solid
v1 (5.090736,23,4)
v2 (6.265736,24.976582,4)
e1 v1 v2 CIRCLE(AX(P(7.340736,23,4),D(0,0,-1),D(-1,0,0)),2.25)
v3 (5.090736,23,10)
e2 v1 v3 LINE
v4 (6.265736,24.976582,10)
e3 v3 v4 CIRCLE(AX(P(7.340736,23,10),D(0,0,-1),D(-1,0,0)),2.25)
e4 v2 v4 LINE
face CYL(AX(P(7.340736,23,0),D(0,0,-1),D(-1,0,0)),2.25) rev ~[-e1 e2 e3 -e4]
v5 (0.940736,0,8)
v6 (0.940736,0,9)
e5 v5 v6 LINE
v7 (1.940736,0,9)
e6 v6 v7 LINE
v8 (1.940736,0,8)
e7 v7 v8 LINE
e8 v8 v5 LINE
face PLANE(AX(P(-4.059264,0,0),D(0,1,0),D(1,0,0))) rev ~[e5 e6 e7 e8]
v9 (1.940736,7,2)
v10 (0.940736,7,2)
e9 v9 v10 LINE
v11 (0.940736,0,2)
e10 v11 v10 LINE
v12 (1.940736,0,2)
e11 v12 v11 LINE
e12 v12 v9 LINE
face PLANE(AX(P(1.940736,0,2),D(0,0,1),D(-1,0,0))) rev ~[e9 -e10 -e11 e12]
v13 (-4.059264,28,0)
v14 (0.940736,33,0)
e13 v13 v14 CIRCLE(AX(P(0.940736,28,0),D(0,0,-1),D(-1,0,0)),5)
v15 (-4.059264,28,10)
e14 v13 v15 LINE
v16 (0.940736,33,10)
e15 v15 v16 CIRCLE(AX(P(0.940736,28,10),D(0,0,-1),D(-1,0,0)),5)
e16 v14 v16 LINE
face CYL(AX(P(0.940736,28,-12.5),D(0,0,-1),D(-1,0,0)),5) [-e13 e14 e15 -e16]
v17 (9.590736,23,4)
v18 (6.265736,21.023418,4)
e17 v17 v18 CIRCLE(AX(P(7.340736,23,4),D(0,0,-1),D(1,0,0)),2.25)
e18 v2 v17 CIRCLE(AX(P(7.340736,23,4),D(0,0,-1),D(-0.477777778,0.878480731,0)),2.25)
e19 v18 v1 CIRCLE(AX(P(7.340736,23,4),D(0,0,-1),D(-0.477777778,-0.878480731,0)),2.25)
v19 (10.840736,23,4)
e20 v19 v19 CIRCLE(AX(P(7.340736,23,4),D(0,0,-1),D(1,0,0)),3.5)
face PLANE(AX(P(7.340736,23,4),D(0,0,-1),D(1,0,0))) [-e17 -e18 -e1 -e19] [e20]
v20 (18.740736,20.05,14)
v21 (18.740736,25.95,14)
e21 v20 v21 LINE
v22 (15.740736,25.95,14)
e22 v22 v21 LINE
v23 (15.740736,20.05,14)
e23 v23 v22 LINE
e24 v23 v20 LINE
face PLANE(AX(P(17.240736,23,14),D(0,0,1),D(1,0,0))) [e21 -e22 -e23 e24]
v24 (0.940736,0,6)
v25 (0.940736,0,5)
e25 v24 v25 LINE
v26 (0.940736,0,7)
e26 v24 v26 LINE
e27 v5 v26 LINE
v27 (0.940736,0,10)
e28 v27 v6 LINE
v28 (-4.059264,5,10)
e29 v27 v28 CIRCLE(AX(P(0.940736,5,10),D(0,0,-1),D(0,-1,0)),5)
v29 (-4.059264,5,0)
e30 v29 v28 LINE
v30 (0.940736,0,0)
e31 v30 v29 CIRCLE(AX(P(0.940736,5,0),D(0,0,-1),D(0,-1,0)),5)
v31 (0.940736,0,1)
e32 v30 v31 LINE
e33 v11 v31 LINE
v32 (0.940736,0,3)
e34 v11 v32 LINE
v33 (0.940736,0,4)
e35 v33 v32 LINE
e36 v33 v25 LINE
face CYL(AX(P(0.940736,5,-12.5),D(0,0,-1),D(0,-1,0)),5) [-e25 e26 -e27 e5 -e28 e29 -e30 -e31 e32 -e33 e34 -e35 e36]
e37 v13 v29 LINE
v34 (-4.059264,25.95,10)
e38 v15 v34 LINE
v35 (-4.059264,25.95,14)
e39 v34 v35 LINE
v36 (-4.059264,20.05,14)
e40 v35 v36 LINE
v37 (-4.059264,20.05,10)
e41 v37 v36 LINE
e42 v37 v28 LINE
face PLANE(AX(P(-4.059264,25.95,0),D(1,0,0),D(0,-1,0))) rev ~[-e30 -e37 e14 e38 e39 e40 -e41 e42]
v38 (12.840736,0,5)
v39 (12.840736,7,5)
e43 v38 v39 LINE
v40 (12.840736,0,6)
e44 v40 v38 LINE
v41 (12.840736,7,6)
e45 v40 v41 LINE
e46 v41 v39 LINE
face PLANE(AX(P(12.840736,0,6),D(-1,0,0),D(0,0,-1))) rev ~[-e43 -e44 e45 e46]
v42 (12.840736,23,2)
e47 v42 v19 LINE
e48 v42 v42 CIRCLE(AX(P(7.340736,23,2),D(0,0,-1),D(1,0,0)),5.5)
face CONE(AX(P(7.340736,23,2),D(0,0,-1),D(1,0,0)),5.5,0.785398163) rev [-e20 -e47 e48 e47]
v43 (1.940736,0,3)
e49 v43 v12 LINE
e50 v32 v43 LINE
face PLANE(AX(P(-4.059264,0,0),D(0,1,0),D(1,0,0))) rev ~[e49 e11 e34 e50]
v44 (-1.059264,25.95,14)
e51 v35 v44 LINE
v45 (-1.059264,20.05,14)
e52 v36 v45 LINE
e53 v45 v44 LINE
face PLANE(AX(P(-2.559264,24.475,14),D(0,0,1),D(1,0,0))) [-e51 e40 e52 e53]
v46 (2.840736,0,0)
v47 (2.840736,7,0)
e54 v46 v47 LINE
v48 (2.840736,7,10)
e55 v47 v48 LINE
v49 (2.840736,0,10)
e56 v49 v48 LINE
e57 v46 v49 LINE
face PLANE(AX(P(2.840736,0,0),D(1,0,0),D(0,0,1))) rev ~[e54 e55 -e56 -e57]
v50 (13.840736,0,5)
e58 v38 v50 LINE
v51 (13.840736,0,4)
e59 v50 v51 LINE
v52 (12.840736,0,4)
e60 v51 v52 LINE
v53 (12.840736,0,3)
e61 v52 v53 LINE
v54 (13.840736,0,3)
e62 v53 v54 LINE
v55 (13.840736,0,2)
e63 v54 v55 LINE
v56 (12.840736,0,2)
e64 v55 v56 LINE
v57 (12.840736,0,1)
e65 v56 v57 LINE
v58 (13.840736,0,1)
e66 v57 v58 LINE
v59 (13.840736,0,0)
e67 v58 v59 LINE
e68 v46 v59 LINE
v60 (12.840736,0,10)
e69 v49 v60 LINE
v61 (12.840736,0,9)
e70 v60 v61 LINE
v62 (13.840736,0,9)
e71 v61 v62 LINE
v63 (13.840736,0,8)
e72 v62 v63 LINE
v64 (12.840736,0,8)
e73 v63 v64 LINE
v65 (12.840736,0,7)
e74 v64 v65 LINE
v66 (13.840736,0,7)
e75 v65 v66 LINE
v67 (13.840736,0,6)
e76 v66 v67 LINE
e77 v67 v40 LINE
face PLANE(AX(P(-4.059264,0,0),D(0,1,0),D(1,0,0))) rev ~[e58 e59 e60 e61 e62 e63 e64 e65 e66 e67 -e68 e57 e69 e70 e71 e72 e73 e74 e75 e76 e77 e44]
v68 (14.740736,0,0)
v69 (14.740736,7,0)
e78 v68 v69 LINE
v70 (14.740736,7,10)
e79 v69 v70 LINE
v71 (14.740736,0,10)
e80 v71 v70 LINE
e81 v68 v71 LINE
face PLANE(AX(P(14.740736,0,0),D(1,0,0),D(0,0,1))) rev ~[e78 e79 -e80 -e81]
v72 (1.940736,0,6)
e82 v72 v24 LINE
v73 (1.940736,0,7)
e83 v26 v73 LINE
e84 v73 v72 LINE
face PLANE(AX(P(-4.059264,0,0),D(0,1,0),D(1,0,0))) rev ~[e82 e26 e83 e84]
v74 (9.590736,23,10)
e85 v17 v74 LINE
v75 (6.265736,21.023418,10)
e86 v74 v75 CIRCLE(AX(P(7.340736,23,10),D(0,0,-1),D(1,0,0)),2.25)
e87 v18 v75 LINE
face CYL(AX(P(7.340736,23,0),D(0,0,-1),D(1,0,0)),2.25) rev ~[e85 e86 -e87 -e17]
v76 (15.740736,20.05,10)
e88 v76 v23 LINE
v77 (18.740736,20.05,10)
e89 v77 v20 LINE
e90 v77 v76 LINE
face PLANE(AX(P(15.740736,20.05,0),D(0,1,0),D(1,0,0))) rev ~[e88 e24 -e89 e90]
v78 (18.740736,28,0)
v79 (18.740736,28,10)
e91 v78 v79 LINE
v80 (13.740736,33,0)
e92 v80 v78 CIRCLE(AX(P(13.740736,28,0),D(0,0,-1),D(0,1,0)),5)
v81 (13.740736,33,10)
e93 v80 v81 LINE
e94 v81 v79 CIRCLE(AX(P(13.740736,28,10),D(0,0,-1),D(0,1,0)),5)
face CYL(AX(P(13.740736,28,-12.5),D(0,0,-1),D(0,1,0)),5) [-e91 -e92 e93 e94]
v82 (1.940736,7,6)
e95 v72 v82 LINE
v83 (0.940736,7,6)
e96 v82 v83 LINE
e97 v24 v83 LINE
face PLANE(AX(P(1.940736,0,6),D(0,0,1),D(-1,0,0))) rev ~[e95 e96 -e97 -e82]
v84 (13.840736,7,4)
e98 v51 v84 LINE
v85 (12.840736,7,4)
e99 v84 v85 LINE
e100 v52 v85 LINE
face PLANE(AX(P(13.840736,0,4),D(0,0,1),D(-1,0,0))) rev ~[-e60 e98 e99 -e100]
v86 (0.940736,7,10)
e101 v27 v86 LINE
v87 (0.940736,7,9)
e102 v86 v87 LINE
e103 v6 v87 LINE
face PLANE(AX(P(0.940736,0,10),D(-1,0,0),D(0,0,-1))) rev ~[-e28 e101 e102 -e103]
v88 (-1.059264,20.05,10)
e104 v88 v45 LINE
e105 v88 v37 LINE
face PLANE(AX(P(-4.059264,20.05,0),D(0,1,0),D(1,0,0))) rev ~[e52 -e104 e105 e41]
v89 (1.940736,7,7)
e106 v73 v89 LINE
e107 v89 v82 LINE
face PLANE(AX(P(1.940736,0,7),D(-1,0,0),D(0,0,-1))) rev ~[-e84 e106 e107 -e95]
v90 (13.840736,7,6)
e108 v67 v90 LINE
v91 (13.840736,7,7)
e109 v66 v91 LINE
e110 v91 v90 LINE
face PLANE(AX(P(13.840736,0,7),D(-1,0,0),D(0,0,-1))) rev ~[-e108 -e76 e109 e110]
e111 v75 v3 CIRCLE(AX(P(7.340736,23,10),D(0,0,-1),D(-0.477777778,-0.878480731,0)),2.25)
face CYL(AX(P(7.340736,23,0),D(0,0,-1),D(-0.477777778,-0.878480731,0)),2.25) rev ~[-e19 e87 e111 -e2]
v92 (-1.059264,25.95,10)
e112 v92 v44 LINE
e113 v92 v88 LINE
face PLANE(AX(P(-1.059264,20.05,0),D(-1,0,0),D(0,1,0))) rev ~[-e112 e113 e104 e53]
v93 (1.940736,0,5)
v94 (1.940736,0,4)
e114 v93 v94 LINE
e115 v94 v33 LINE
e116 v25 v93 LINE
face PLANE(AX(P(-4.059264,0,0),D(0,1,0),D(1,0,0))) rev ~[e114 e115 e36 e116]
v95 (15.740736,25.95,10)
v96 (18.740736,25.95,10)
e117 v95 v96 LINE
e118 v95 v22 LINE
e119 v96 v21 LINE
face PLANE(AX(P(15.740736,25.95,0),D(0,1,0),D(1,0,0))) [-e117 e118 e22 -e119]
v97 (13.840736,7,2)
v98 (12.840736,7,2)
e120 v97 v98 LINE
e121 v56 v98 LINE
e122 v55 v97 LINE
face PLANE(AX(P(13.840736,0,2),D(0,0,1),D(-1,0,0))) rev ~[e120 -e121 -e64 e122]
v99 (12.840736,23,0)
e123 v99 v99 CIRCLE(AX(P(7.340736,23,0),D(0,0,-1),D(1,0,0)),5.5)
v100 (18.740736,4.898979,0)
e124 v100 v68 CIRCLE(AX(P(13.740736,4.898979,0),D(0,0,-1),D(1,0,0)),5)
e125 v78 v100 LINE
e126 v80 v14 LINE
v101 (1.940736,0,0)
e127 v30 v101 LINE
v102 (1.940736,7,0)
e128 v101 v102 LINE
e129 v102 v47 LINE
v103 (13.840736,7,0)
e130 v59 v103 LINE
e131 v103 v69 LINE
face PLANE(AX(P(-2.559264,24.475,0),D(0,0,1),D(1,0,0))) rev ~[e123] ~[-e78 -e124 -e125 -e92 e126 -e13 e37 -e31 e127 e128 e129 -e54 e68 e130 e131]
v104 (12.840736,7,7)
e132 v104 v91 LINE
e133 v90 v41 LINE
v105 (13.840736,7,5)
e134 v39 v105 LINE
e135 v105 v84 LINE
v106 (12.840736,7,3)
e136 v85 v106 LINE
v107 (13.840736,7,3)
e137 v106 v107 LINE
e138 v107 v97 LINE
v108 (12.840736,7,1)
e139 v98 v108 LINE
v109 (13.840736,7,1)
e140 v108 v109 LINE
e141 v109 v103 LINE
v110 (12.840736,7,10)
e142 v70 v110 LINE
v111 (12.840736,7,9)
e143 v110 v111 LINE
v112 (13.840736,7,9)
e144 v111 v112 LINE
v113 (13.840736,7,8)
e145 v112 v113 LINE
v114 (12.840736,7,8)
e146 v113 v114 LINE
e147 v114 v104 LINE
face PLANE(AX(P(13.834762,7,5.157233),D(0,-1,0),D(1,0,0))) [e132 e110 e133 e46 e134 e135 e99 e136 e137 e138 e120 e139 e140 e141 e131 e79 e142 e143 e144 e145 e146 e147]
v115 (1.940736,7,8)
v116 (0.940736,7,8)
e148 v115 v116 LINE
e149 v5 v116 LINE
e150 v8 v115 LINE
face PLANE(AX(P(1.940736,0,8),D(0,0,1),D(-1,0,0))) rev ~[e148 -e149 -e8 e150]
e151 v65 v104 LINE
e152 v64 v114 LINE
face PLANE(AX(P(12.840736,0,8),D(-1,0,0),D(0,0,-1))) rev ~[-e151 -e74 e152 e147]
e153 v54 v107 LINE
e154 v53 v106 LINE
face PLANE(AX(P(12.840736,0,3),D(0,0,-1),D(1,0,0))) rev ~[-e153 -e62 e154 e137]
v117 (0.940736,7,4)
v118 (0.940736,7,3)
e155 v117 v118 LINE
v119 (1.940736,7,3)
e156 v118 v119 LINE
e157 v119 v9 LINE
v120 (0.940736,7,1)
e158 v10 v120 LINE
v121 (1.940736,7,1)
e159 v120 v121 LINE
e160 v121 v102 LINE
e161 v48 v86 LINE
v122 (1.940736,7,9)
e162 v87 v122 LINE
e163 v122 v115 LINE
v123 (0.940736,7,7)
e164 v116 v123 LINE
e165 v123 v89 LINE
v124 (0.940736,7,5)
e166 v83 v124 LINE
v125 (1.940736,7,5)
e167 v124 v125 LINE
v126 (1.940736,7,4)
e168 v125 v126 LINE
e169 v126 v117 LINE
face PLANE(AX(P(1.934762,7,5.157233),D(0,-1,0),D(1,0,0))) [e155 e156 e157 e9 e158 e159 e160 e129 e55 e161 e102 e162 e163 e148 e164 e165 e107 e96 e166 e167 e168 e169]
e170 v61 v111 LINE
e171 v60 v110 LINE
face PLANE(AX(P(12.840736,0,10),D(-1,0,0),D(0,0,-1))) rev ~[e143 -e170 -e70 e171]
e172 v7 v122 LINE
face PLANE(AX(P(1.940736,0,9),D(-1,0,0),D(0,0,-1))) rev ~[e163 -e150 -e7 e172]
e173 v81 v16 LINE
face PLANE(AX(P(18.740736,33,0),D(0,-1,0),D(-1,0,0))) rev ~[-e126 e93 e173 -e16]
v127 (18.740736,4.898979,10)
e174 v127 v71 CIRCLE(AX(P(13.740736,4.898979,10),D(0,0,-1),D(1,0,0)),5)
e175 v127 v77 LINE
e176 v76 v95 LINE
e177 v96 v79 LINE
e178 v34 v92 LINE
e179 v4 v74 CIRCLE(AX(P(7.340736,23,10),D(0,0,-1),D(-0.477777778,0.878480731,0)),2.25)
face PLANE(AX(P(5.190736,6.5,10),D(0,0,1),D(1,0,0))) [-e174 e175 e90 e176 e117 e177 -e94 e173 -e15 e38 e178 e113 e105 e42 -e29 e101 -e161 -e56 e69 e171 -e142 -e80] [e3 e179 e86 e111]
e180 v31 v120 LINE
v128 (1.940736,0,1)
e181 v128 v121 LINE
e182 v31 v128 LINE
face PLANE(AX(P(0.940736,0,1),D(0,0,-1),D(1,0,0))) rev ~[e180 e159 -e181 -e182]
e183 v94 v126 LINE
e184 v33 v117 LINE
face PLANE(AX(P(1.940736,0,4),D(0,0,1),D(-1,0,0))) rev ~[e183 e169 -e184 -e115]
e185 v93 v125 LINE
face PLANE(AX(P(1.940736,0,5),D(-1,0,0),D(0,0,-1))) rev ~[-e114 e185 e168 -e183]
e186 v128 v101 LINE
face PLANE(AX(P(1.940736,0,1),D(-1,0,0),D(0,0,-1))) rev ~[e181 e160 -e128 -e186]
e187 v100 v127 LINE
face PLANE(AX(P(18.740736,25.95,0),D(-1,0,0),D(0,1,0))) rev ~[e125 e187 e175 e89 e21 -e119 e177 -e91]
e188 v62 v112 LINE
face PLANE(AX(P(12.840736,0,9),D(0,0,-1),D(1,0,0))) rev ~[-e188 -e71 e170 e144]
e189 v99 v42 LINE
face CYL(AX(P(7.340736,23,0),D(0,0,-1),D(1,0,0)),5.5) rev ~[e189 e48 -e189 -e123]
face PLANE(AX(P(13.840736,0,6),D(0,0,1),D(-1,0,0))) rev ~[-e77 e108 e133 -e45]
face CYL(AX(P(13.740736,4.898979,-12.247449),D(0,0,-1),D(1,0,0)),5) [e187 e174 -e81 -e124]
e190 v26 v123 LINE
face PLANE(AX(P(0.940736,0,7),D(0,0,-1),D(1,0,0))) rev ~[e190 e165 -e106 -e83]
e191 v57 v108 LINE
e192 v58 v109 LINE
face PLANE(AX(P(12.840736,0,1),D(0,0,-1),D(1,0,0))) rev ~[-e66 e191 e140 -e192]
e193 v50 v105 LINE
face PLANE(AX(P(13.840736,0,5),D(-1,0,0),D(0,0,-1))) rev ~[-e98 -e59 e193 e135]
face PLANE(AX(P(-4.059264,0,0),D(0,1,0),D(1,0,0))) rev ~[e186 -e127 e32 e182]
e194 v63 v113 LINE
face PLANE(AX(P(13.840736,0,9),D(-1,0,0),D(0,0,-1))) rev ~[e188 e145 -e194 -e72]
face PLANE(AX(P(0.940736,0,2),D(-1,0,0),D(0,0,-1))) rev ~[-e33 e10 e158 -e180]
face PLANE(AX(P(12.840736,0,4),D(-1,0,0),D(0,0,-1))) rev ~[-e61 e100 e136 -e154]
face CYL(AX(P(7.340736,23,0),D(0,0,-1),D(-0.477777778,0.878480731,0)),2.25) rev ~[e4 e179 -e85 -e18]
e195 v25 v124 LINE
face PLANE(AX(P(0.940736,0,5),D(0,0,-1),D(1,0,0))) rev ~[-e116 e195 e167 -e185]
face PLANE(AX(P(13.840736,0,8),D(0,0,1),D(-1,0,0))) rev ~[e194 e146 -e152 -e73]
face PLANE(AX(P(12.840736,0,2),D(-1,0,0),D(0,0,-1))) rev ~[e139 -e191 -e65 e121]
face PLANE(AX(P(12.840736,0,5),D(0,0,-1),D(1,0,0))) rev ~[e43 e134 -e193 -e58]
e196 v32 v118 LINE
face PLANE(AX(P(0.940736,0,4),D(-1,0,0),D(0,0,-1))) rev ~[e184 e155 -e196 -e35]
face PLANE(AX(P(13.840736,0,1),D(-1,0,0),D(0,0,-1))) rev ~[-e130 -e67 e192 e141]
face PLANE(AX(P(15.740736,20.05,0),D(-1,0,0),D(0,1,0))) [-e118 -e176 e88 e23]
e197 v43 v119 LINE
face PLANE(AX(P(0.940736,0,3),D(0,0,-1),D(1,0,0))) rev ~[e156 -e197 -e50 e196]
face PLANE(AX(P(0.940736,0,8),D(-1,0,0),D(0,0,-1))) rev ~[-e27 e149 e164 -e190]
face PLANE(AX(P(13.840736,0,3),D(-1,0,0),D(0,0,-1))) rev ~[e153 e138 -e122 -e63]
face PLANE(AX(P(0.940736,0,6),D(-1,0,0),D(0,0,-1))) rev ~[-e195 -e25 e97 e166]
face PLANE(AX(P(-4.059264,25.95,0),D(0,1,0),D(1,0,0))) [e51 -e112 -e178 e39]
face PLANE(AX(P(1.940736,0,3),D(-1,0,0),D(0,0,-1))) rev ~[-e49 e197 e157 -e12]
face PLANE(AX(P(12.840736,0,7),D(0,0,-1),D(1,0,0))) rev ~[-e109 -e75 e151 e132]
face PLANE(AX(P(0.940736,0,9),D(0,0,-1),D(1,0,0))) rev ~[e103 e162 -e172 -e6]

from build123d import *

# Parameters (mm, degrees)
F0_W        = 18.5
F0_H        = 13
F0_W_2      = 4.3
F0_W_3      = 3
F0_H_2      = 2.95
F1_DEPTH    = 10
F3_DEPTH    = 7
F4_T1_DEPTH = 35
F4_T3_DEPTH = 34.4948974279
F0_H_3      = 5.9
F5_DEPTH    = 14
F6_R        = 5.5
F7_DEPTH    = 4
F8_SIZE     = 2


# Not quite as in the source:
# - a fillet or chamfer that OpenCascade refuses, or shapes differently, is made with other operations: its cross-section is extruded or revolved along the edge and cut away or added


with BuildPart() as f1:
    # F0 (on Top) → F1 (new body)
    with BuildSketch(Plane.XY):
        with Locations((5.190736489, 6.5)):
            Rectangle(F0_W, F0_H)
        with Locations((16.590736489, 6.5)):
            Rectangle(F0_W_2, F0_H)
        Polygon((14.440736489, 20.05), (14.440736489, 13), (18.740736489, 13), (18.740736489, 20.05), (15.740736489, 20.05), (15.740736489, 25.95), (18.740736489, 25.95), (18.740736489, 33), (14.440736489, 33), (14.440736489, 25.95), (14.440736489, 23), align=None)
        with BuildLine():
            Line((-4.059263511, 20.05), (-4.059263511, 13))
            Line((-4.059263511, 13), (14.440736489, 13))
            Line((14.440736489, 13), (14.440736489, 20.05))
            Line((14.440736489, 20.05), (11.440736489, 20.05))
            Line((11.440736489, 20.05), (11.440736489, 23))
            Line((11.440736489, 23), (9.590736489, 23))
            ThreePointArc((9.590736489, 23), (8.4904647177, 21.0659304563), (6.265736489, 21.0234183548))
            ThreePointArc((6.265736489, 21.0234183548), (4.0410082602, 21.0659304563), (2.940736489, 23))
            Line((2.940736489, 23), (-1.059263511, 23))
            Line((-1.059263511, 23), (-1.059263511, 20.05))
            Line((-1.059263511, 20.05), (-4.059263511, 20.05))
        make_face()
        with Locations((12.940736489, 21.525)):
            Rectangle(F0_W_3, F0_H_2)
        with Locations((12.940736489, 24.475)):
            Rectangle(F0_W_3, F0_H_2)
        with BuildLine():
            Line((-4.059263511, 33), (-4.059263511, 25.95))
            Line((-4.059263511, 25.95), (-1.059263511, 25.95))
            Line((-1.059263511, 25.95), (-1.059263511, 23))
            Line((-1.059263511, 23), (2.940736489, 23))
            ThreePointArc((2.940736489, 23), (4.0410082602, 24.9340695437), (6.265736489, 24.9765816452))
            ThreePointArc((6.265736489, 24.9765816452), (8.4904647177, 24.9340695437), (9.590736489, 23))
            Line((9.590736489, 23), (11.440736489, 23))
            Line((11.440736489, 23), (11.440736489, 25.95))
            Line((11.440736489, 25.95), (14.440736489, 25.95))
            Line((14.440736489, 25.95), (14.440736489, 33))
            Line((14.440736489, 33), (-4.059263511, 33))
        make_face()
        with BuildLine():
            Line((5.090736489, 23), (2.940736489, 23))
            ThreePointArc((2.940736489, 23), (4.0410082602, 21.0659304563), (6.265736489, 21.0234183548))
            ThreePointArc((6.265736489, 21.0234183548), (5.4066669452, 21.8502717712), (5.090736489, 23))
        make_face()
        with BuildLine():
            ThreePointArc((6.265736489, 24.9765816452), (4.0410082602, 24.9340695437), (2.940736489, 23))
            Line((2.940736489, 23), (5.090736489, 23))
            ThreePointArc((5.090736489, 23), (5.4066669452, 24.1497282288), (6.265736489, 24.9765816452))
        make_face()
    extrude(amount=F1_DEPTH)

    # F2 (on face) → F3 (cut)
    with BuildSketch(Plane.XZ):
        Polygon((2.840736489, 10), (0.940736489, 10), (0.940736489, 9), (1.940736489, 9), (1.940736489, 8), (0.940736489, 8), (0.940736489, 7), (1.940736489, 7), (1.940736489, 6), (0.940736489, 6), (0.940736489, 5), (1.940736489, 5), (1.940736489, 4), (0.940736489, 4), (0.940736489, 3), (1.940736489, 3), (1.940736489, 2), (0.940736489, 2), (0.940736489, 1), (1.940736489, 1), (1.940736489, 0), (2.840736489, 0), align=None)
        Polygon((14.740736489, 10), (12.840736489, 10), (12.840736489, 9), (13.840736489, 9), (13.840736489, 8), (12.840736489, 8), (12.840736489, 7), (13.840736489, 7), (13.840736489, 6), (12.840736489, 6), (12.840736489, 5), (13.840736489, 5), (13.840736489, 4), (12.840736489, 4), (12.840736489, 3), (13.840736489, 3), (13.840736489, 2), (12.840736489, 2), (12.840736489, 1), (13.840736489, 1), (13.840736489, 0), (14.740736489, 0), align=None)
    extrude(amount=-F3_DEPTH, mode=Mode.SUBTRACT)

    # F4: fillet of radius 5 on 4 edges, made by hand

    # F4_s2 → F4_t1 (cut)
    with BuildSketch(Plane.XY.offset(-12.5)):
        with BuildLine():
            ThreePointArc((-4.059263511, 28), (-2.594797417, 31.5355339059), (0.940736489, 33))
            Line((0.940736489, 33), (-4.059263511, 33))
            Line((-4.059263511, 33), (-4.059263511, 28))
        make_face()
        with BuildLine():
            ThreePointArc((0.940736489, 0), (-2.594797417, 1.4644660941), (-4.059263511, 5))
            Line((-4.059263511, 5), (-4.059263511, 0))
            Line((-4.059263511, 0), (0.940736489, 0))
        make_face()
        with BuildLine():
            ThreePointArc((13.740736489, 33), (17.2762703949, 31.5355339059), (18.740736489, 28))
            Line((18.740736489, 28), (18.740736489, 33))
            Line((18.740736489, 33), (13.740736489, 33))
        make_face()
    extrude(amount=F4_T1_DEPTH, mode=Mode.SUBTRACT)

    # F4_s4 → F4_t3 (cut)
    with BuildSketch(Plane.XY.offset(-12.2474487139)):
        with BuildLine():
            ThreePointArc((18.740736489, 4.8989794856), (17.6137198352, 1.7367018254), (14.740736489, 0))
            Line((14.740736489, 0), (18.740736489, 0))
            Line((18.740736489, 0), (18.740736489, 4.8989794856))
        make_face()
    extrude(amount=F4_T3_DEPTH, mode=Mode.SUBTRACT)

    # F0 (on Top) → F5 (join)
    with BuildSketch(Plane.XY):
        with Locations((-2.559263511, 24.475)):
            Rectangle(F0_W_3, F0_H_2)
        with Locations((-2.559263511, 21.525)):
            Rectangle(F0_W_3, F0_H_2)
        with Locations((17.240736489, 23)):
            Rectangle(F0_W_3, F0_H_3)
    extrude(amount=F5_DEPTH)

    # F6 (on face) → F7 (cut)
    with BuildSketch(Plane(origin=(0, 0, 0), x_dir=(1, 0, 0), z_dir=(0, 0, -1))):
        with Locations((7.340736489, -23)):
            Circle(F6_R)
    extrude(amount=-F7_DEPTH, mode=Mode.SUBTRACT)

    # F8
    f8_edges = [f1.edges().sort_by_distance(p)[0] for p in [
        (1.840736, 23, 4),
    ]]
    chamfer(f8_edges, length=F8_SIZE)


solid = f1.part
